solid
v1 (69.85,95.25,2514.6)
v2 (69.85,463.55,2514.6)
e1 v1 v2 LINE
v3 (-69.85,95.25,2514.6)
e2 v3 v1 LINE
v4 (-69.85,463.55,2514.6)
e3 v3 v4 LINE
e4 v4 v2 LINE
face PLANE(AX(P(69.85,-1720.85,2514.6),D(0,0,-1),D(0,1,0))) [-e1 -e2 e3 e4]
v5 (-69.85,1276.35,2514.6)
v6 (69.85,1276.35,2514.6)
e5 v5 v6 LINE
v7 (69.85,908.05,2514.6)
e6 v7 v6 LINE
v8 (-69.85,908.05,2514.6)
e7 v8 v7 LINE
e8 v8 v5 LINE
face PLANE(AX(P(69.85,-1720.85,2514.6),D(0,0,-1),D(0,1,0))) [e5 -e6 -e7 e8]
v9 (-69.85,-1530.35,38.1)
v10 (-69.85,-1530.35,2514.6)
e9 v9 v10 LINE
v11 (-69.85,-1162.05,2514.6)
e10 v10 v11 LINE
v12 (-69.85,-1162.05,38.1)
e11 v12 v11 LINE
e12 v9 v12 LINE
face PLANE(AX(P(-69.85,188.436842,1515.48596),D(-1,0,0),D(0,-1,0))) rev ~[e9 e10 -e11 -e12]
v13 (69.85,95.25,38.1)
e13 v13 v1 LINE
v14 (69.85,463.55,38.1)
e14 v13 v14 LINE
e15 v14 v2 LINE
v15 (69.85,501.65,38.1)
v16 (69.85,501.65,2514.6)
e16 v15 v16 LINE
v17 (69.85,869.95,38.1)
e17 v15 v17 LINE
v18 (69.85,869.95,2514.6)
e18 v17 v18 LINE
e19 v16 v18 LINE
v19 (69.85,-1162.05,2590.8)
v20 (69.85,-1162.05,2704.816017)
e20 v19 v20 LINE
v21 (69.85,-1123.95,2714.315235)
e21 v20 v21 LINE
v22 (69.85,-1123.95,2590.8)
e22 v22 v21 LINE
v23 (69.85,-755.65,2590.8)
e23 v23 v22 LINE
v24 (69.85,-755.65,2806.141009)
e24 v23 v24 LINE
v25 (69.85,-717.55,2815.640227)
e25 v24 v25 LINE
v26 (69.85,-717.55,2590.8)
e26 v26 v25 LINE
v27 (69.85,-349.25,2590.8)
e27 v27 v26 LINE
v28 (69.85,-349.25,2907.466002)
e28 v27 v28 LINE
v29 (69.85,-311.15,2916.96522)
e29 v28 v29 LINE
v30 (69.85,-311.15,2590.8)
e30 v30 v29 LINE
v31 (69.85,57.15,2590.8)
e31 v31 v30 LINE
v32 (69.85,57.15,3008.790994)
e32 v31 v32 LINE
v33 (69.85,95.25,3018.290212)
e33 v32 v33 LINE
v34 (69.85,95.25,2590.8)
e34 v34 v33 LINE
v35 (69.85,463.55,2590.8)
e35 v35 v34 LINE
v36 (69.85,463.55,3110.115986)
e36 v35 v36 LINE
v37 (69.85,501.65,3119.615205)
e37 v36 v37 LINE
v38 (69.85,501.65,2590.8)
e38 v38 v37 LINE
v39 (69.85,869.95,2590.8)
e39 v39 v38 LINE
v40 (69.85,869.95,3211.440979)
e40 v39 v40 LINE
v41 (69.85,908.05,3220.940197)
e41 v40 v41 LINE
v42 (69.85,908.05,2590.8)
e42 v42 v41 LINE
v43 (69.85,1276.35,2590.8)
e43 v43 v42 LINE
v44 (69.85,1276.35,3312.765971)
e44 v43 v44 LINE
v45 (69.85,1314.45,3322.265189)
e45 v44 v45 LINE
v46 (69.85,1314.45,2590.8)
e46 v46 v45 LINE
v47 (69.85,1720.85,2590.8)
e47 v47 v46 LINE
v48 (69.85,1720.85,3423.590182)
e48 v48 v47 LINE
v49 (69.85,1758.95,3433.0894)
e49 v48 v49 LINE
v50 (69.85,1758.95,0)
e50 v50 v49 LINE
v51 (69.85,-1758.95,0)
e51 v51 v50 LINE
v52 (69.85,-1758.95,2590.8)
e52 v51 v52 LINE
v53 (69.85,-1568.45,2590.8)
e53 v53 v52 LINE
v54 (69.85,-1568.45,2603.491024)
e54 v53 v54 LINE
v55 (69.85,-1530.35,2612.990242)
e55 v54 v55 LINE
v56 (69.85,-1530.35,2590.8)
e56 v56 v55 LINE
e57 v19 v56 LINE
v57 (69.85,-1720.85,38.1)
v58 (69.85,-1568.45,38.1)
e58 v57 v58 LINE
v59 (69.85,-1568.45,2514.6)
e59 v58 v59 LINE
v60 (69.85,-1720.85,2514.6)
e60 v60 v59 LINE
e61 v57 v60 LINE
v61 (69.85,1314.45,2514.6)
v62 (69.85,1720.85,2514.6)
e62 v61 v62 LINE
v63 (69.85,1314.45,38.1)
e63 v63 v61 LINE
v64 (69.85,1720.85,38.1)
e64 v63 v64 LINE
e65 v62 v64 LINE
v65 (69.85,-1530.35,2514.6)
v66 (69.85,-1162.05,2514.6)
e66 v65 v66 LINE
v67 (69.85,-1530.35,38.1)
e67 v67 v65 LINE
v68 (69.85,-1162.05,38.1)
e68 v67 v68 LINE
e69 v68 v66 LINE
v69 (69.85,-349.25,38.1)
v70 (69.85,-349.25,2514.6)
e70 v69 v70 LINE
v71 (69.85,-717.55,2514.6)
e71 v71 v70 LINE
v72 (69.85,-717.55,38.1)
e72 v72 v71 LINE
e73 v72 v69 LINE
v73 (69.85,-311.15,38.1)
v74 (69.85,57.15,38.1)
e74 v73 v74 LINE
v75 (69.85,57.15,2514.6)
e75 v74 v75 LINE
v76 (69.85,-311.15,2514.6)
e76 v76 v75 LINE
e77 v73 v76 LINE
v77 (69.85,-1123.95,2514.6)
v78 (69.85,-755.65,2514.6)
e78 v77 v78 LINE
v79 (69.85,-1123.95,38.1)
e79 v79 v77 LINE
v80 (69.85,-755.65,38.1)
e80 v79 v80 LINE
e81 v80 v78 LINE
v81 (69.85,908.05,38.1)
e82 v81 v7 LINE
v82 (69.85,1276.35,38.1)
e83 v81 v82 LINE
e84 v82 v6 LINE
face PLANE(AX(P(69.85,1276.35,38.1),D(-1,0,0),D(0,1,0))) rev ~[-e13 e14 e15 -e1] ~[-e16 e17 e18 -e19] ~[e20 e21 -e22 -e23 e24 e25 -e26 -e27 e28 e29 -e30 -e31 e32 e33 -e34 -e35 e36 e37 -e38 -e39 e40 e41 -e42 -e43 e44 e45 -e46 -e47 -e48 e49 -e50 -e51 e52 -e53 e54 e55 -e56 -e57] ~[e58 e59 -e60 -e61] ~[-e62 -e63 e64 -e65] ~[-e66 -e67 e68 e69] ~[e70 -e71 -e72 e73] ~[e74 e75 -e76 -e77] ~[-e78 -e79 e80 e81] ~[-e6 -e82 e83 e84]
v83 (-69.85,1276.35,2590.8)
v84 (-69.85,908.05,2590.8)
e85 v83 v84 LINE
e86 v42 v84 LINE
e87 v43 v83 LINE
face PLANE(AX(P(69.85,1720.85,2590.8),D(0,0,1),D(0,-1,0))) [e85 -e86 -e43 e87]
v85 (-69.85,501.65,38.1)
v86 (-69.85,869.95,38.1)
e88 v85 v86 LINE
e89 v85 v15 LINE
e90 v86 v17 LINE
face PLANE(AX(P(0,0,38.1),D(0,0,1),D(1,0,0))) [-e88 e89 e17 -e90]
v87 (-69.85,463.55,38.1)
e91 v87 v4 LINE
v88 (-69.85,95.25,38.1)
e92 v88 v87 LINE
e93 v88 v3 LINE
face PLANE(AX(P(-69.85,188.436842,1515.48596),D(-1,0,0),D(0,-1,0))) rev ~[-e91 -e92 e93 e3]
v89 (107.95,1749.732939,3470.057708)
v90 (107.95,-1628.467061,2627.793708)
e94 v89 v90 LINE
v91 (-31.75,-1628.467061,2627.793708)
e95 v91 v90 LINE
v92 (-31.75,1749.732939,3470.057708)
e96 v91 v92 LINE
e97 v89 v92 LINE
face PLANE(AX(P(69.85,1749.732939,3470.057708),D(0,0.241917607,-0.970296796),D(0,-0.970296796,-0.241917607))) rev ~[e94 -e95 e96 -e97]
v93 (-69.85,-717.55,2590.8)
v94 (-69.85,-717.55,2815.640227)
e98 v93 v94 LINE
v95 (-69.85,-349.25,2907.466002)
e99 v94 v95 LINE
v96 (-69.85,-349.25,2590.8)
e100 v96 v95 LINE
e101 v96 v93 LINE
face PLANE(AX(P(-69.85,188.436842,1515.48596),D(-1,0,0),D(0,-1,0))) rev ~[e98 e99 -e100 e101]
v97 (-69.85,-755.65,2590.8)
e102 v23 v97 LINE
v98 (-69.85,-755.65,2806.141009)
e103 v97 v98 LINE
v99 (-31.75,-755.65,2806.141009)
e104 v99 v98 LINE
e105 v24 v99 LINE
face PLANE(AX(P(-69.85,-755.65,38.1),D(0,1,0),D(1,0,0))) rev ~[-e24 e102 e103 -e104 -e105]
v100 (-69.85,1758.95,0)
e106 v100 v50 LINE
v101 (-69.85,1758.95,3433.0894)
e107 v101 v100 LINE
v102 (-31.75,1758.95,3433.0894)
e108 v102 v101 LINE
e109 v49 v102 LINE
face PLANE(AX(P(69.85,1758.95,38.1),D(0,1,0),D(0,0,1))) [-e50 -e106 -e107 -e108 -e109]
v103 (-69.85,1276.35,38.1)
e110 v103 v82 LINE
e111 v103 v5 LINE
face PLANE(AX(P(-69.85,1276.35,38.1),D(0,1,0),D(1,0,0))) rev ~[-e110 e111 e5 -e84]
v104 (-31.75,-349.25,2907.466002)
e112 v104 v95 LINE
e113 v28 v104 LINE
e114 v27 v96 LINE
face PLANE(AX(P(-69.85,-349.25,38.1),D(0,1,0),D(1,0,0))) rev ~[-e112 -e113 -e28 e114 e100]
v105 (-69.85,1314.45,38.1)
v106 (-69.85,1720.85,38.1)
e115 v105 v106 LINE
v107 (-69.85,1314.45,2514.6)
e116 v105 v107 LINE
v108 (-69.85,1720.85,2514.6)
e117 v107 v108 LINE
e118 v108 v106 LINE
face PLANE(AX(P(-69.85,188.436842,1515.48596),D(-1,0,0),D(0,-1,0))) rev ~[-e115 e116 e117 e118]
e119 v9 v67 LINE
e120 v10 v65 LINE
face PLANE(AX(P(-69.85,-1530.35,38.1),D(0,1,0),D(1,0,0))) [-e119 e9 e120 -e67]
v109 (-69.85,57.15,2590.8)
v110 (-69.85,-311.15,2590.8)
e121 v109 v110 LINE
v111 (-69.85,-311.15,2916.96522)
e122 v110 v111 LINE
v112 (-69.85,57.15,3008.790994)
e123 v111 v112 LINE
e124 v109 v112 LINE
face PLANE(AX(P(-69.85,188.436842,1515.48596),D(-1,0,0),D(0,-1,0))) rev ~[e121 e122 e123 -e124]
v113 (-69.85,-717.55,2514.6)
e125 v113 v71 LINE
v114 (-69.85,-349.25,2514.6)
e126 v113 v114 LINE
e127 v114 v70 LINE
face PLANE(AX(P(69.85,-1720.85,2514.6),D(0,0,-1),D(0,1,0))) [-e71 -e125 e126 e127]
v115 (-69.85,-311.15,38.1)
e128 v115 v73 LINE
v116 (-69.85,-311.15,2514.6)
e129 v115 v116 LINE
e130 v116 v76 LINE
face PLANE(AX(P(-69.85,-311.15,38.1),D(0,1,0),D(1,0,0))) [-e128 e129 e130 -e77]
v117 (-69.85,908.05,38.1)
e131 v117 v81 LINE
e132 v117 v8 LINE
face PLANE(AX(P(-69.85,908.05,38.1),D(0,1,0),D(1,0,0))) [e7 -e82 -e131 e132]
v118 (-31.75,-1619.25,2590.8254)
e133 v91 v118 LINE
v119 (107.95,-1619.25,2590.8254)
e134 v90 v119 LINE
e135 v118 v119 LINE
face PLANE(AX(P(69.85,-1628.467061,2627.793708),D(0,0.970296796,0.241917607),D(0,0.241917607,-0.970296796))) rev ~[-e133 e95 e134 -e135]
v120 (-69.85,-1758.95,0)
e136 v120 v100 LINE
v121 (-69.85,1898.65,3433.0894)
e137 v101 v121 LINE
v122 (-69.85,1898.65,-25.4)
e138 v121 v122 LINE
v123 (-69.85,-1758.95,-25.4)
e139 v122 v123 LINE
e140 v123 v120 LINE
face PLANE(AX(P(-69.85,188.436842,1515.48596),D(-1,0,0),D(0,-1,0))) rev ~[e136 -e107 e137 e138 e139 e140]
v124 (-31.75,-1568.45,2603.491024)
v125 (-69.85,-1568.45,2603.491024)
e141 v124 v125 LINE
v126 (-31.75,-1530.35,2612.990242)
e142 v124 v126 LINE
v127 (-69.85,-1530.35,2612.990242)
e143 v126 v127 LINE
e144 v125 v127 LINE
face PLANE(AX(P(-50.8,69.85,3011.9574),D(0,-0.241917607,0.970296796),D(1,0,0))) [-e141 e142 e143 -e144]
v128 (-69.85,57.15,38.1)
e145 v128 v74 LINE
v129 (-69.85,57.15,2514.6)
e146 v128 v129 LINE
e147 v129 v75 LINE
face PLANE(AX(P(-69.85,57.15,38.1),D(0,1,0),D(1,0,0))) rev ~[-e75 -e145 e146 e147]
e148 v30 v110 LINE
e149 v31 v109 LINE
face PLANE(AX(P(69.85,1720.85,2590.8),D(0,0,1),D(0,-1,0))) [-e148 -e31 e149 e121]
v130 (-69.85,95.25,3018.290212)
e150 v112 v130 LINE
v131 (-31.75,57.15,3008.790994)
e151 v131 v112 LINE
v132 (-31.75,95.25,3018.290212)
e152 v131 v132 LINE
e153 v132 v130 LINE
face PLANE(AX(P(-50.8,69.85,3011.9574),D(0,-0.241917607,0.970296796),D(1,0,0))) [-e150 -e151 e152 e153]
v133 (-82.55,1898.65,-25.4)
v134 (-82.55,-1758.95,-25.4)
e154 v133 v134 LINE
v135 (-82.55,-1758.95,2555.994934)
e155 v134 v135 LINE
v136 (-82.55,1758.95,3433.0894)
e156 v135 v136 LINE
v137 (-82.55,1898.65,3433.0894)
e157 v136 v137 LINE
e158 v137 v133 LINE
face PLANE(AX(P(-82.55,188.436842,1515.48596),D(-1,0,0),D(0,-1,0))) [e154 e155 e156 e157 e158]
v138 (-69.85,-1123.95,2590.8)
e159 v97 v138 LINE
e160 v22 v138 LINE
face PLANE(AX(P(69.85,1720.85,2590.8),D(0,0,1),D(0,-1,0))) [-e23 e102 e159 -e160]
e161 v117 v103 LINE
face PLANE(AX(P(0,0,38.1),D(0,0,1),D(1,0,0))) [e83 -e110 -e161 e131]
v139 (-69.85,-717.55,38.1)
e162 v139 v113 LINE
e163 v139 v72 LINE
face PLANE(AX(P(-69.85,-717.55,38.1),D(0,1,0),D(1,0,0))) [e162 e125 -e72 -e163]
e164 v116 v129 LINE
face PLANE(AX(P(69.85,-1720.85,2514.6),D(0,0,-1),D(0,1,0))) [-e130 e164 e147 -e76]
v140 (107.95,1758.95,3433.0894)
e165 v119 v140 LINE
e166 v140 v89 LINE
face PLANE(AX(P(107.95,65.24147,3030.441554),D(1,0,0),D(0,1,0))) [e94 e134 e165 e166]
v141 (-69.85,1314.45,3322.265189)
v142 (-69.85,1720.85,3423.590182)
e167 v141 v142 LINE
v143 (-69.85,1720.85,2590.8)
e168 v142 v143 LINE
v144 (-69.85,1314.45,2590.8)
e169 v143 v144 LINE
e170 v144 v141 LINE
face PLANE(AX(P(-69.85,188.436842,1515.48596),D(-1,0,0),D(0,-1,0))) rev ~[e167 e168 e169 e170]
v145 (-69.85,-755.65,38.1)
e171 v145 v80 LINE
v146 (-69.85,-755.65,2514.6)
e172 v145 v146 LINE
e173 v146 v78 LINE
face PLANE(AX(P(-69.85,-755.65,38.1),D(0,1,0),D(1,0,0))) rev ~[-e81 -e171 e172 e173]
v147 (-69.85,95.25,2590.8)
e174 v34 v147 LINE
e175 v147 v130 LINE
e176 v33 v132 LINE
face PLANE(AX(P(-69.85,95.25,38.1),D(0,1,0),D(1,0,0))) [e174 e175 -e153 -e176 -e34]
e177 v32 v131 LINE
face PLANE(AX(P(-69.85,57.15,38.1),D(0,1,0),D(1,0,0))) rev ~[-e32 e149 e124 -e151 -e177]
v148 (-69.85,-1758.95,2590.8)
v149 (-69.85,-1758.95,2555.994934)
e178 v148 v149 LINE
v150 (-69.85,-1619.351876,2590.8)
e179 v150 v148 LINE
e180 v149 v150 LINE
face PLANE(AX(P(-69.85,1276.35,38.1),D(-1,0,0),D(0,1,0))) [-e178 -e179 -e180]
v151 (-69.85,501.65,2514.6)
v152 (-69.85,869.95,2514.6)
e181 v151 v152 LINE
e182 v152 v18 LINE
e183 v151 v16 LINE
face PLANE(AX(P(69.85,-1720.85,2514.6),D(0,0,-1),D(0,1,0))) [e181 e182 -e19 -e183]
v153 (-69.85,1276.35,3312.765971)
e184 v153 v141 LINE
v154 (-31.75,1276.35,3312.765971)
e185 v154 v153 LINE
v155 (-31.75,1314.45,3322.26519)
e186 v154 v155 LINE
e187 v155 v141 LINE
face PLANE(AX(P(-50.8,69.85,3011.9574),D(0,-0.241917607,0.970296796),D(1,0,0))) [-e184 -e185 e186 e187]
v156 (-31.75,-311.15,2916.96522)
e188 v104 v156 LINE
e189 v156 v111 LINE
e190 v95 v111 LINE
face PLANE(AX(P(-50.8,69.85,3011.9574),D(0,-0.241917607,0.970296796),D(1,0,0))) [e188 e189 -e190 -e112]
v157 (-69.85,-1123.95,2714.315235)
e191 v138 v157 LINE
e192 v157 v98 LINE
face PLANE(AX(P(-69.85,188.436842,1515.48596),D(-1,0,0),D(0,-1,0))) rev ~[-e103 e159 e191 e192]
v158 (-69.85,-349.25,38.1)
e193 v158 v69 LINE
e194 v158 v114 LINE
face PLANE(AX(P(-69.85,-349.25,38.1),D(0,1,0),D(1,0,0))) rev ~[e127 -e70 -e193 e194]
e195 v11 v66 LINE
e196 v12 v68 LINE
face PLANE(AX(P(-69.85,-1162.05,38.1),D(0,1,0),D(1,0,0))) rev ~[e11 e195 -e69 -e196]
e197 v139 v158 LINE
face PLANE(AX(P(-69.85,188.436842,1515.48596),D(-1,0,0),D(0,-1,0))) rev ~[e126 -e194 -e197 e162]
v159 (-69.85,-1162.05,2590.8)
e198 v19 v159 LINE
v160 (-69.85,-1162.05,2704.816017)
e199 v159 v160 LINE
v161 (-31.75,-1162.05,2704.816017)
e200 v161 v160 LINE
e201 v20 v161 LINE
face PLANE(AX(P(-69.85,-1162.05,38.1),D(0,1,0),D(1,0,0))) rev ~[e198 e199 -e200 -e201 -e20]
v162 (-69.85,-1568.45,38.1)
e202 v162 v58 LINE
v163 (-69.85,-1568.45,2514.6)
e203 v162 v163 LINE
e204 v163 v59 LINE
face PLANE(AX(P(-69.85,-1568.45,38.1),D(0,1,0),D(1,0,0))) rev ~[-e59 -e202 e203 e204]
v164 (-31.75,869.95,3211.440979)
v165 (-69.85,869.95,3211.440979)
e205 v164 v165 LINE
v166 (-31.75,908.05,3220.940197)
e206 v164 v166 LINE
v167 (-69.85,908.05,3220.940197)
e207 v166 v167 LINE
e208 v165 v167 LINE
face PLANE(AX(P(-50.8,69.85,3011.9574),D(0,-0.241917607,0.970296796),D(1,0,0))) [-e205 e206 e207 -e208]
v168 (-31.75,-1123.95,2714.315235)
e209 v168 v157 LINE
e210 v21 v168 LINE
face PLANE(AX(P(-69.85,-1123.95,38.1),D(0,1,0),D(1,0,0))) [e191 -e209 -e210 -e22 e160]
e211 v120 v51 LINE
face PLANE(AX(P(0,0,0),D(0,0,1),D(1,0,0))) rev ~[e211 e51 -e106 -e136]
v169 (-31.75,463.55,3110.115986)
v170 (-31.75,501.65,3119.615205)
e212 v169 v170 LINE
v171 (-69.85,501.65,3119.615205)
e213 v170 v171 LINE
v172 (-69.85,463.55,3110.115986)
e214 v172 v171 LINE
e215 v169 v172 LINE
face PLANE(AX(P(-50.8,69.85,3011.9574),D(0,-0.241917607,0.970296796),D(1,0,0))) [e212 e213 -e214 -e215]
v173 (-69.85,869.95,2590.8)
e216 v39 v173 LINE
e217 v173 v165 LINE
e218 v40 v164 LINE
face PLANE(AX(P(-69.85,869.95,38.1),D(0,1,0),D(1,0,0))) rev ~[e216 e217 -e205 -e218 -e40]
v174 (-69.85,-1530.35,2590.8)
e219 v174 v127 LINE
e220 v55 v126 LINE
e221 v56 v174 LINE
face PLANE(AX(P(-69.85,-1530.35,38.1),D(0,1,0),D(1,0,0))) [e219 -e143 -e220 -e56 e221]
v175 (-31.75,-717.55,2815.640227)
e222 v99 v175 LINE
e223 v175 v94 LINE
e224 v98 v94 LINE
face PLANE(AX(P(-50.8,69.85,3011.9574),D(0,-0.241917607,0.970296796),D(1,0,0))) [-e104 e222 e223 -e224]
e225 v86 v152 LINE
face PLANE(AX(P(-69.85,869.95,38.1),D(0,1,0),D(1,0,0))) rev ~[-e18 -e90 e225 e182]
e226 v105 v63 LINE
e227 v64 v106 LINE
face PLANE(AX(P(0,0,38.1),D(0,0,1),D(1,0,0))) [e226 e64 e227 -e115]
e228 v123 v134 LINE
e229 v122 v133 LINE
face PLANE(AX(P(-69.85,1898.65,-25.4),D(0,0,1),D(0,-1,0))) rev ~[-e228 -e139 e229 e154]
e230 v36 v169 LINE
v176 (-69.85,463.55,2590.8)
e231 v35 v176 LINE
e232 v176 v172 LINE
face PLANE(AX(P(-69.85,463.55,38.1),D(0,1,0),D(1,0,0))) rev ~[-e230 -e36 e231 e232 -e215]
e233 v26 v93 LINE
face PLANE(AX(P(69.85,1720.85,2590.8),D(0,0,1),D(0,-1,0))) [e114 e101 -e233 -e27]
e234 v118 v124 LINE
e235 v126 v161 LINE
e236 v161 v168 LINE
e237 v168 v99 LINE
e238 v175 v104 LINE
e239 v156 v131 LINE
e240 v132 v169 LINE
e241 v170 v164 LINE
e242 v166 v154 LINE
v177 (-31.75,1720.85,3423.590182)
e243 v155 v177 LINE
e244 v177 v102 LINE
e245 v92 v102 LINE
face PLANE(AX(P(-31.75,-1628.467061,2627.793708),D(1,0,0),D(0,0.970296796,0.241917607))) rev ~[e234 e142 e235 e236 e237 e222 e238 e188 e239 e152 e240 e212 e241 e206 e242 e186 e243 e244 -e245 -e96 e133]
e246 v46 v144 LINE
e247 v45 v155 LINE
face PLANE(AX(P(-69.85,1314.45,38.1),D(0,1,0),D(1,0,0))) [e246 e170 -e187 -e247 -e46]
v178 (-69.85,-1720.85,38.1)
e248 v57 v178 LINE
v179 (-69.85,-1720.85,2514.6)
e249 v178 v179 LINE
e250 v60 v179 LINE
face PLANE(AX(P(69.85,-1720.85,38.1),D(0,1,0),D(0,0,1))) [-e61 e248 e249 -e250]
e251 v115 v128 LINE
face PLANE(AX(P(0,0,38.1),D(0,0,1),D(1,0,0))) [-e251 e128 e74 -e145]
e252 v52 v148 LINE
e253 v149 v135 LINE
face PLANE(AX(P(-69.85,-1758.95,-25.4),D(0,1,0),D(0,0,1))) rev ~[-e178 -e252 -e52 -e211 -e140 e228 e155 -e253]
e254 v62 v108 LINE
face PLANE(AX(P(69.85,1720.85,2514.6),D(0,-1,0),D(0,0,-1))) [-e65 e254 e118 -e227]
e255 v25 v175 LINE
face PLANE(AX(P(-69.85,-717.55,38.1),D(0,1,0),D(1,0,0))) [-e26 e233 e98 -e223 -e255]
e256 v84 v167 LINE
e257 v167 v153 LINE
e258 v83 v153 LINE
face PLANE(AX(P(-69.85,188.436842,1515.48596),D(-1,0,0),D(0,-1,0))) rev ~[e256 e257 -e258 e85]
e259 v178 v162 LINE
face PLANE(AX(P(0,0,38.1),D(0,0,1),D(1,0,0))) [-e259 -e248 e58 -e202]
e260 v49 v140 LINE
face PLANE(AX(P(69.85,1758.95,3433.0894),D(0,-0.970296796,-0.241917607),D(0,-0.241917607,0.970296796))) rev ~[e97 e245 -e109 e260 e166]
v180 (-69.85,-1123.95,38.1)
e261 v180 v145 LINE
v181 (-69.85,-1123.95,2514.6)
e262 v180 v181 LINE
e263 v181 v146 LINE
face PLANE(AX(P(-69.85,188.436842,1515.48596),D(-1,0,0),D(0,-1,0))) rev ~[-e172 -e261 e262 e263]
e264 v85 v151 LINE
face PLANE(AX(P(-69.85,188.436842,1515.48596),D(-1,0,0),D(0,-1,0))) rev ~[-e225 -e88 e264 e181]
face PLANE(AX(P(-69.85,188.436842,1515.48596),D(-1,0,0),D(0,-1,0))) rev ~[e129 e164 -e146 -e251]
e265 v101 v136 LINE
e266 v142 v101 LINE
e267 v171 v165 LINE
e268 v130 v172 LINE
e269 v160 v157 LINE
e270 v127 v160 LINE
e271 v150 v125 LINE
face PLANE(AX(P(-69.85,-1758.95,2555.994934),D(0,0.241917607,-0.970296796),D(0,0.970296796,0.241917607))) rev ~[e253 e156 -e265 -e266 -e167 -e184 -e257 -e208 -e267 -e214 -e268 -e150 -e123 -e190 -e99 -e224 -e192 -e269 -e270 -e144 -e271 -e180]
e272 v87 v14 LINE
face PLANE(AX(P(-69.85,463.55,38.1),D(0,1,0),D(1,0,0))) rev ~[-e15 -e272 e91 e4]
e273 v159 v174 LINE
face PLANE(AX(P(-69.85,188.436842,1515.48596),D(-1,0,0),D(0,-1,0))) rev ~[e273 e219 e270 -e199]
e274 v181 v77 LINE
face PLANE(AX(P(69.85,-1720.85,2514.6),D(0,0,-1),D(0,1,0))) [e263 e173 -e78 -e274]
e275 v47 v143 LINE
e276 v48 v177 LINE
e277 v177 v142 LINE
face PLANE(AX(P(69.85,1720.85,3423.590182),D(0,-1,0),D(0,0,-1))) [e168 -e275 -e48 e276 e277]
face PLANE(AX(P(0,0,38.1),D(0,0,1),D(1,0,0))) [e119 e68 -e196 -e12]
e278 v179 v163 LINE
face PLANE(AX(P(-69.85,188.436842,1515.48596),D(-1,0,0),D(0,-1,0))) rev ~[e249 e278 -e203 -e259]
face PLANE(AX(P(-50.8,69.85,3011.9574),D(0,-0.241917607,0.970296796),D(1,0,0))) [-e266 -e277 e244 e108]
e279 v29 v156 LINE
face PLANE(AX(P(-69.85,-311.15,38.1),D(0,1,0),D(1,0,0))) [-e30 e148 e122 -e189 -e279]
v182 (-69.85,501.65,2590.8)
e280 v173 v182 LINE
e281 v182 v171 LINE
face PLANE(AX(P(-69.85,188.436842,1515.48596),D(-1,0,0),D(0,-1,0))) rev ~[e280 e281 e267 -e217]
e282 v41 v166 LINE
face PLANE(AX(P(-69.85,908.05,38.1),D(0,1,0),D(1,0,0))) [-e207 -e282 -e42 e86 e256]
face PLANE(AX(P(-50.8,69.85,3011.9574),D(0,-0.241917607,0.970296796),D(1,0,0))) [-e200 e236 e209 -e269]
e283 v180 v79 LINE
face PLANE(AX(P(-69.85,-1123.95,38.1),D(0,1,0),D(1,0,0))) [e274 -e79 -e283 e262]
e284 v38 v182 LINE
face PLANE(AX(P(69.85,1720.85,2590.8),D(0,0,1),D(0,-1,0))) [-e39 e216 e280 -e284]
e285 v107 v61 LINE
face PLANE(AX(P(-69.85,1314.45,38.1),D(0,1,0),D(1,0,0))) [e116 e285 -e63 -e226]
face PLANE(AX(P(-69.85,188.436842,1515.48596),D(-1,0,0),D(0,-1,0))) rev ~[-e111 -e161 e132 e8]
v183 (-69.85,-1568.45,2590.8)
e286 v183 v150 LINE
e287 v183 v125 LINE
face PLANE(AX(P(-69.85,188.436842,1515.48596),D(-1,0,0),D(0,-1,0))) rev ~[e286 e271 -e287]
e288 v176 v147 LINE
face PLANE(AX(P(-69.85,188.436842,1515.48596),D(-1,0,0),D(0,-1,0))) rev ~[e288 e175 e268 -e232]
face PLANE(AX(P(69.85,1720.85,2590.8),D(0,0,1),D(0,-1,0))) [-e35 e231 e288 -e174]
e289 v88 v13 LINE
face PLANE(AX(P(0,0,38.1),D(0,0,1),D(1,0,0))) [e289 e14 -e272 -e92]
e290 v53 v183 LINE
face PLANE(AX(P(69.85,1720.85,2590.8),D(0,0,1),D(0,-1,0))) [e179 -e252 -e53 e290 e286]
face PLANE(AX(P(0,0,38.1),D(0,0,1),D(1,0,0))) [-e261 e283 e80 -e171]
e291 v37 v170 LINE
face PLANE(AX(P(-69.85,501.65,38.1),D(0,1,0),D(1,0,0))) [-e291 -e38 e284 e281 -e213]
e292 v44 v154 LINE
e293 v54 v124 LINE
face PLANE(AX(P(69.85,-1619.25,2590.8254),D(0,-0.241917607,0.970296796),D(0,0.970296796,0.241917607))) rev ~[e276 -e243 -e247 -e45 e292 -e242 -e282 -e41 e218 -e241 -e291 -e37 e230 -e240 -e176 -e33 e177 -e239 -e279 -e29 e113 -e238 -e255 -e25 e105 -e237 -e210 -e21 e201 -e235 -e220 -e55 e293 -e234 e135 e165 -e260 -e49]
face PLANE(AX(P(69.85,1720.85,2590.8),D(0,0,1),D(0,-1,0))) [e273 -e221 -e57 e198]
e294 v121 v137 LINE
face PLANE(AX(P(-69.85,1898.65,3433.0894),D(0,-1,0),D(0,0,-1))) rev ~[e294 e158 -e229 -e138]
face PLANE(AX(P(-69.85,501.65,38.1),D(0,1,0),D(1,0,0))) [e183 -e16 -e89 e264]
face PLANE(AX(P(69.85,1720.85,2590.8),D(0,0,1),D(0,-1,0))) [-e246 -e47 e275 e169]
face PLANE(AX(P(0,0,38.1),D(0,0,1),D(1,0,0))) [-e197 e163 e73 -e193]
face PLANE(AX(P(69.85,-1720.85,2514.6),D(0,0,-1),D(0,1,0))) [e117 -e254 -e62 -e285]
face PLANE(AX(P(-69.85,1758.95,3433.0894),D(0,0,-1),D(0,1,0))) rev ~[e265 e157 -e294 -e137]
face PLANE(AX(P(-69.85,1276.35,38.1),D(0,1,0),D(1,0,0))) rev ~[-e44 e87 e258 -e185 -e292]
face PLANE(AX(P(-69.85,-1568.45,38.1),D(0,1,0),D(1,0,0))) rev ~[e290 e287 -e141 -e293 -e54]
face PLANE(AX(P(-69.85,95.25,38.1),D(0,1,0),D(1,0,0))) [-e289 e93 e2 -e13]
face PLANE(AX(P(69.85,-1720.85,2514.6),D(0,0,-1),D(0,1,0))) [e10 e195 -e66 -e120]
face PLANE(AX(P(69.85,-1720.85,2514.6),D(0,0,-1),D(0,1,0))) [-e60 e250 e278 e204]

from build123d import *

# Parameters (mm, degrees)
F0_W      = 139.7
F0_H      = 3517.9
F1_DEPTH  = 38.1
F3_DEPTH  = 139.7
F4_W      = 139.7
F4_H      = 38.1
F5_REACH  = 3576.7609868968
F6_W      = 38.1
F6_H      = 3481.6151260149
F7_DEPTH  = 38.1
F9_DEPTH  = 38.1
F11_DEPTH = 12.7


with BuildPart() as f1:
    # F0 (on Top) → F1 (new body)
    with BuildSketch(Plane.XY):
        Rectangle(F0_W, F0_H)
    extrude(amount=F1_DEPTH)

    # F2 (on face) → F3 (join, through all)
    with BuildSketch(Plane.YZ.offset(69.85)):
        Polygon((1720.85, 2590.8), (-1758.95, 2590.8), (-1758.95, 38.1), (-1720.85, 38.1), (-1720.85, 2514.6), (1720.85, 2514.6), (1720.85, 38.1), (1758.95, 38.1), (1758.95, 2590.8), (1758.95, 3433.0894), (1749.7329391709, 3470.0577079092), (-1628.4670608291, 2627.7937079092), (-1619.25, 2590.8254), (1720.85, 3423.5901819549), align=None)
    extrude(amount=-F3_DEPTH)

    f5_end = f1.faces().sort_by_distance((0, 50.8, 3007.2077909774))[0]
    # F4 (on face) → F5 (join, up to a face of the model that its end follows)
    with BuildSketch(Plane.XY.offset(38.1)):
        with Locations((0, 1295.4)):
            Rectangle(F4_W, F4_H)
        with Locations((0, 889)):
            Rectangle(F4_W, F4_H)
        with Locations((0, 482.6)):
            Rectangle(F4_W, F4_H)
        with Locations((0, 76.2)):
            Rectangle(F4_W, F4_H)
        with Locations((0, -330.2)):
            Rectangle(F4_W, F4_H)
        with Locations((0, -736.6)):
            Rectangle(F4_W, F4_H)
        with Locations((0, -1143)):
            Rectangle(F4_W, F4_H)
        with Locations((0, -1549.4)):
            Rectangle(F4_W, F4_H)
    f5_long = extrude(amount=F5_REACH, mode=Mode.PRIVATE)
    add(split(f5_long, bisect_by=f5_end, keep=Keep.TOP, mode=Mode.PRIVATE))

    # F6 (on face) → F7 (cut)
    with BuildSketch(Plane(origin=(0, -712.1315701529, 2856.2575039305), x_dir=(1, 0, 0), z_dir=(0, -0.2419176071, 0.9702967955))):
        with Locations((-50.8, 796.4207579507)):
            Rectangle(F6_W, F6_H)
    extrude(amount=-F7_DEPTH, mode=Mode.SUBTRACT)

    # F8 (on face) → F9 (join)
    with BuildSketch(Plane.YZ.offset(69.85)):
        Polygon((1749.7329391709, 3470.0577079092), (-1628.4670608291, 2627.7937079092), (-1619.25, 2590.8254), (1758.95, 3433.0894), align=None)
    extrude(amount=F9_DEPTH)

    # F10 (on face) → F11 (join)
    with BuildSketch(Plane(origin=(-69.85, 0, 0), x_dir=(0, -1, 0), z_dir=(-1, 0, 0))):
        Polygon((-1898.65, -25.4), (1758.95, -25.4), (1758.95, 2555.9949338346), (-1758.95, 3433.0894), (-1898.65, 3433.0894), (-1898.65, 0), align=None)
    extrude(amount=F11_DEPTH)


solid = f1.part
